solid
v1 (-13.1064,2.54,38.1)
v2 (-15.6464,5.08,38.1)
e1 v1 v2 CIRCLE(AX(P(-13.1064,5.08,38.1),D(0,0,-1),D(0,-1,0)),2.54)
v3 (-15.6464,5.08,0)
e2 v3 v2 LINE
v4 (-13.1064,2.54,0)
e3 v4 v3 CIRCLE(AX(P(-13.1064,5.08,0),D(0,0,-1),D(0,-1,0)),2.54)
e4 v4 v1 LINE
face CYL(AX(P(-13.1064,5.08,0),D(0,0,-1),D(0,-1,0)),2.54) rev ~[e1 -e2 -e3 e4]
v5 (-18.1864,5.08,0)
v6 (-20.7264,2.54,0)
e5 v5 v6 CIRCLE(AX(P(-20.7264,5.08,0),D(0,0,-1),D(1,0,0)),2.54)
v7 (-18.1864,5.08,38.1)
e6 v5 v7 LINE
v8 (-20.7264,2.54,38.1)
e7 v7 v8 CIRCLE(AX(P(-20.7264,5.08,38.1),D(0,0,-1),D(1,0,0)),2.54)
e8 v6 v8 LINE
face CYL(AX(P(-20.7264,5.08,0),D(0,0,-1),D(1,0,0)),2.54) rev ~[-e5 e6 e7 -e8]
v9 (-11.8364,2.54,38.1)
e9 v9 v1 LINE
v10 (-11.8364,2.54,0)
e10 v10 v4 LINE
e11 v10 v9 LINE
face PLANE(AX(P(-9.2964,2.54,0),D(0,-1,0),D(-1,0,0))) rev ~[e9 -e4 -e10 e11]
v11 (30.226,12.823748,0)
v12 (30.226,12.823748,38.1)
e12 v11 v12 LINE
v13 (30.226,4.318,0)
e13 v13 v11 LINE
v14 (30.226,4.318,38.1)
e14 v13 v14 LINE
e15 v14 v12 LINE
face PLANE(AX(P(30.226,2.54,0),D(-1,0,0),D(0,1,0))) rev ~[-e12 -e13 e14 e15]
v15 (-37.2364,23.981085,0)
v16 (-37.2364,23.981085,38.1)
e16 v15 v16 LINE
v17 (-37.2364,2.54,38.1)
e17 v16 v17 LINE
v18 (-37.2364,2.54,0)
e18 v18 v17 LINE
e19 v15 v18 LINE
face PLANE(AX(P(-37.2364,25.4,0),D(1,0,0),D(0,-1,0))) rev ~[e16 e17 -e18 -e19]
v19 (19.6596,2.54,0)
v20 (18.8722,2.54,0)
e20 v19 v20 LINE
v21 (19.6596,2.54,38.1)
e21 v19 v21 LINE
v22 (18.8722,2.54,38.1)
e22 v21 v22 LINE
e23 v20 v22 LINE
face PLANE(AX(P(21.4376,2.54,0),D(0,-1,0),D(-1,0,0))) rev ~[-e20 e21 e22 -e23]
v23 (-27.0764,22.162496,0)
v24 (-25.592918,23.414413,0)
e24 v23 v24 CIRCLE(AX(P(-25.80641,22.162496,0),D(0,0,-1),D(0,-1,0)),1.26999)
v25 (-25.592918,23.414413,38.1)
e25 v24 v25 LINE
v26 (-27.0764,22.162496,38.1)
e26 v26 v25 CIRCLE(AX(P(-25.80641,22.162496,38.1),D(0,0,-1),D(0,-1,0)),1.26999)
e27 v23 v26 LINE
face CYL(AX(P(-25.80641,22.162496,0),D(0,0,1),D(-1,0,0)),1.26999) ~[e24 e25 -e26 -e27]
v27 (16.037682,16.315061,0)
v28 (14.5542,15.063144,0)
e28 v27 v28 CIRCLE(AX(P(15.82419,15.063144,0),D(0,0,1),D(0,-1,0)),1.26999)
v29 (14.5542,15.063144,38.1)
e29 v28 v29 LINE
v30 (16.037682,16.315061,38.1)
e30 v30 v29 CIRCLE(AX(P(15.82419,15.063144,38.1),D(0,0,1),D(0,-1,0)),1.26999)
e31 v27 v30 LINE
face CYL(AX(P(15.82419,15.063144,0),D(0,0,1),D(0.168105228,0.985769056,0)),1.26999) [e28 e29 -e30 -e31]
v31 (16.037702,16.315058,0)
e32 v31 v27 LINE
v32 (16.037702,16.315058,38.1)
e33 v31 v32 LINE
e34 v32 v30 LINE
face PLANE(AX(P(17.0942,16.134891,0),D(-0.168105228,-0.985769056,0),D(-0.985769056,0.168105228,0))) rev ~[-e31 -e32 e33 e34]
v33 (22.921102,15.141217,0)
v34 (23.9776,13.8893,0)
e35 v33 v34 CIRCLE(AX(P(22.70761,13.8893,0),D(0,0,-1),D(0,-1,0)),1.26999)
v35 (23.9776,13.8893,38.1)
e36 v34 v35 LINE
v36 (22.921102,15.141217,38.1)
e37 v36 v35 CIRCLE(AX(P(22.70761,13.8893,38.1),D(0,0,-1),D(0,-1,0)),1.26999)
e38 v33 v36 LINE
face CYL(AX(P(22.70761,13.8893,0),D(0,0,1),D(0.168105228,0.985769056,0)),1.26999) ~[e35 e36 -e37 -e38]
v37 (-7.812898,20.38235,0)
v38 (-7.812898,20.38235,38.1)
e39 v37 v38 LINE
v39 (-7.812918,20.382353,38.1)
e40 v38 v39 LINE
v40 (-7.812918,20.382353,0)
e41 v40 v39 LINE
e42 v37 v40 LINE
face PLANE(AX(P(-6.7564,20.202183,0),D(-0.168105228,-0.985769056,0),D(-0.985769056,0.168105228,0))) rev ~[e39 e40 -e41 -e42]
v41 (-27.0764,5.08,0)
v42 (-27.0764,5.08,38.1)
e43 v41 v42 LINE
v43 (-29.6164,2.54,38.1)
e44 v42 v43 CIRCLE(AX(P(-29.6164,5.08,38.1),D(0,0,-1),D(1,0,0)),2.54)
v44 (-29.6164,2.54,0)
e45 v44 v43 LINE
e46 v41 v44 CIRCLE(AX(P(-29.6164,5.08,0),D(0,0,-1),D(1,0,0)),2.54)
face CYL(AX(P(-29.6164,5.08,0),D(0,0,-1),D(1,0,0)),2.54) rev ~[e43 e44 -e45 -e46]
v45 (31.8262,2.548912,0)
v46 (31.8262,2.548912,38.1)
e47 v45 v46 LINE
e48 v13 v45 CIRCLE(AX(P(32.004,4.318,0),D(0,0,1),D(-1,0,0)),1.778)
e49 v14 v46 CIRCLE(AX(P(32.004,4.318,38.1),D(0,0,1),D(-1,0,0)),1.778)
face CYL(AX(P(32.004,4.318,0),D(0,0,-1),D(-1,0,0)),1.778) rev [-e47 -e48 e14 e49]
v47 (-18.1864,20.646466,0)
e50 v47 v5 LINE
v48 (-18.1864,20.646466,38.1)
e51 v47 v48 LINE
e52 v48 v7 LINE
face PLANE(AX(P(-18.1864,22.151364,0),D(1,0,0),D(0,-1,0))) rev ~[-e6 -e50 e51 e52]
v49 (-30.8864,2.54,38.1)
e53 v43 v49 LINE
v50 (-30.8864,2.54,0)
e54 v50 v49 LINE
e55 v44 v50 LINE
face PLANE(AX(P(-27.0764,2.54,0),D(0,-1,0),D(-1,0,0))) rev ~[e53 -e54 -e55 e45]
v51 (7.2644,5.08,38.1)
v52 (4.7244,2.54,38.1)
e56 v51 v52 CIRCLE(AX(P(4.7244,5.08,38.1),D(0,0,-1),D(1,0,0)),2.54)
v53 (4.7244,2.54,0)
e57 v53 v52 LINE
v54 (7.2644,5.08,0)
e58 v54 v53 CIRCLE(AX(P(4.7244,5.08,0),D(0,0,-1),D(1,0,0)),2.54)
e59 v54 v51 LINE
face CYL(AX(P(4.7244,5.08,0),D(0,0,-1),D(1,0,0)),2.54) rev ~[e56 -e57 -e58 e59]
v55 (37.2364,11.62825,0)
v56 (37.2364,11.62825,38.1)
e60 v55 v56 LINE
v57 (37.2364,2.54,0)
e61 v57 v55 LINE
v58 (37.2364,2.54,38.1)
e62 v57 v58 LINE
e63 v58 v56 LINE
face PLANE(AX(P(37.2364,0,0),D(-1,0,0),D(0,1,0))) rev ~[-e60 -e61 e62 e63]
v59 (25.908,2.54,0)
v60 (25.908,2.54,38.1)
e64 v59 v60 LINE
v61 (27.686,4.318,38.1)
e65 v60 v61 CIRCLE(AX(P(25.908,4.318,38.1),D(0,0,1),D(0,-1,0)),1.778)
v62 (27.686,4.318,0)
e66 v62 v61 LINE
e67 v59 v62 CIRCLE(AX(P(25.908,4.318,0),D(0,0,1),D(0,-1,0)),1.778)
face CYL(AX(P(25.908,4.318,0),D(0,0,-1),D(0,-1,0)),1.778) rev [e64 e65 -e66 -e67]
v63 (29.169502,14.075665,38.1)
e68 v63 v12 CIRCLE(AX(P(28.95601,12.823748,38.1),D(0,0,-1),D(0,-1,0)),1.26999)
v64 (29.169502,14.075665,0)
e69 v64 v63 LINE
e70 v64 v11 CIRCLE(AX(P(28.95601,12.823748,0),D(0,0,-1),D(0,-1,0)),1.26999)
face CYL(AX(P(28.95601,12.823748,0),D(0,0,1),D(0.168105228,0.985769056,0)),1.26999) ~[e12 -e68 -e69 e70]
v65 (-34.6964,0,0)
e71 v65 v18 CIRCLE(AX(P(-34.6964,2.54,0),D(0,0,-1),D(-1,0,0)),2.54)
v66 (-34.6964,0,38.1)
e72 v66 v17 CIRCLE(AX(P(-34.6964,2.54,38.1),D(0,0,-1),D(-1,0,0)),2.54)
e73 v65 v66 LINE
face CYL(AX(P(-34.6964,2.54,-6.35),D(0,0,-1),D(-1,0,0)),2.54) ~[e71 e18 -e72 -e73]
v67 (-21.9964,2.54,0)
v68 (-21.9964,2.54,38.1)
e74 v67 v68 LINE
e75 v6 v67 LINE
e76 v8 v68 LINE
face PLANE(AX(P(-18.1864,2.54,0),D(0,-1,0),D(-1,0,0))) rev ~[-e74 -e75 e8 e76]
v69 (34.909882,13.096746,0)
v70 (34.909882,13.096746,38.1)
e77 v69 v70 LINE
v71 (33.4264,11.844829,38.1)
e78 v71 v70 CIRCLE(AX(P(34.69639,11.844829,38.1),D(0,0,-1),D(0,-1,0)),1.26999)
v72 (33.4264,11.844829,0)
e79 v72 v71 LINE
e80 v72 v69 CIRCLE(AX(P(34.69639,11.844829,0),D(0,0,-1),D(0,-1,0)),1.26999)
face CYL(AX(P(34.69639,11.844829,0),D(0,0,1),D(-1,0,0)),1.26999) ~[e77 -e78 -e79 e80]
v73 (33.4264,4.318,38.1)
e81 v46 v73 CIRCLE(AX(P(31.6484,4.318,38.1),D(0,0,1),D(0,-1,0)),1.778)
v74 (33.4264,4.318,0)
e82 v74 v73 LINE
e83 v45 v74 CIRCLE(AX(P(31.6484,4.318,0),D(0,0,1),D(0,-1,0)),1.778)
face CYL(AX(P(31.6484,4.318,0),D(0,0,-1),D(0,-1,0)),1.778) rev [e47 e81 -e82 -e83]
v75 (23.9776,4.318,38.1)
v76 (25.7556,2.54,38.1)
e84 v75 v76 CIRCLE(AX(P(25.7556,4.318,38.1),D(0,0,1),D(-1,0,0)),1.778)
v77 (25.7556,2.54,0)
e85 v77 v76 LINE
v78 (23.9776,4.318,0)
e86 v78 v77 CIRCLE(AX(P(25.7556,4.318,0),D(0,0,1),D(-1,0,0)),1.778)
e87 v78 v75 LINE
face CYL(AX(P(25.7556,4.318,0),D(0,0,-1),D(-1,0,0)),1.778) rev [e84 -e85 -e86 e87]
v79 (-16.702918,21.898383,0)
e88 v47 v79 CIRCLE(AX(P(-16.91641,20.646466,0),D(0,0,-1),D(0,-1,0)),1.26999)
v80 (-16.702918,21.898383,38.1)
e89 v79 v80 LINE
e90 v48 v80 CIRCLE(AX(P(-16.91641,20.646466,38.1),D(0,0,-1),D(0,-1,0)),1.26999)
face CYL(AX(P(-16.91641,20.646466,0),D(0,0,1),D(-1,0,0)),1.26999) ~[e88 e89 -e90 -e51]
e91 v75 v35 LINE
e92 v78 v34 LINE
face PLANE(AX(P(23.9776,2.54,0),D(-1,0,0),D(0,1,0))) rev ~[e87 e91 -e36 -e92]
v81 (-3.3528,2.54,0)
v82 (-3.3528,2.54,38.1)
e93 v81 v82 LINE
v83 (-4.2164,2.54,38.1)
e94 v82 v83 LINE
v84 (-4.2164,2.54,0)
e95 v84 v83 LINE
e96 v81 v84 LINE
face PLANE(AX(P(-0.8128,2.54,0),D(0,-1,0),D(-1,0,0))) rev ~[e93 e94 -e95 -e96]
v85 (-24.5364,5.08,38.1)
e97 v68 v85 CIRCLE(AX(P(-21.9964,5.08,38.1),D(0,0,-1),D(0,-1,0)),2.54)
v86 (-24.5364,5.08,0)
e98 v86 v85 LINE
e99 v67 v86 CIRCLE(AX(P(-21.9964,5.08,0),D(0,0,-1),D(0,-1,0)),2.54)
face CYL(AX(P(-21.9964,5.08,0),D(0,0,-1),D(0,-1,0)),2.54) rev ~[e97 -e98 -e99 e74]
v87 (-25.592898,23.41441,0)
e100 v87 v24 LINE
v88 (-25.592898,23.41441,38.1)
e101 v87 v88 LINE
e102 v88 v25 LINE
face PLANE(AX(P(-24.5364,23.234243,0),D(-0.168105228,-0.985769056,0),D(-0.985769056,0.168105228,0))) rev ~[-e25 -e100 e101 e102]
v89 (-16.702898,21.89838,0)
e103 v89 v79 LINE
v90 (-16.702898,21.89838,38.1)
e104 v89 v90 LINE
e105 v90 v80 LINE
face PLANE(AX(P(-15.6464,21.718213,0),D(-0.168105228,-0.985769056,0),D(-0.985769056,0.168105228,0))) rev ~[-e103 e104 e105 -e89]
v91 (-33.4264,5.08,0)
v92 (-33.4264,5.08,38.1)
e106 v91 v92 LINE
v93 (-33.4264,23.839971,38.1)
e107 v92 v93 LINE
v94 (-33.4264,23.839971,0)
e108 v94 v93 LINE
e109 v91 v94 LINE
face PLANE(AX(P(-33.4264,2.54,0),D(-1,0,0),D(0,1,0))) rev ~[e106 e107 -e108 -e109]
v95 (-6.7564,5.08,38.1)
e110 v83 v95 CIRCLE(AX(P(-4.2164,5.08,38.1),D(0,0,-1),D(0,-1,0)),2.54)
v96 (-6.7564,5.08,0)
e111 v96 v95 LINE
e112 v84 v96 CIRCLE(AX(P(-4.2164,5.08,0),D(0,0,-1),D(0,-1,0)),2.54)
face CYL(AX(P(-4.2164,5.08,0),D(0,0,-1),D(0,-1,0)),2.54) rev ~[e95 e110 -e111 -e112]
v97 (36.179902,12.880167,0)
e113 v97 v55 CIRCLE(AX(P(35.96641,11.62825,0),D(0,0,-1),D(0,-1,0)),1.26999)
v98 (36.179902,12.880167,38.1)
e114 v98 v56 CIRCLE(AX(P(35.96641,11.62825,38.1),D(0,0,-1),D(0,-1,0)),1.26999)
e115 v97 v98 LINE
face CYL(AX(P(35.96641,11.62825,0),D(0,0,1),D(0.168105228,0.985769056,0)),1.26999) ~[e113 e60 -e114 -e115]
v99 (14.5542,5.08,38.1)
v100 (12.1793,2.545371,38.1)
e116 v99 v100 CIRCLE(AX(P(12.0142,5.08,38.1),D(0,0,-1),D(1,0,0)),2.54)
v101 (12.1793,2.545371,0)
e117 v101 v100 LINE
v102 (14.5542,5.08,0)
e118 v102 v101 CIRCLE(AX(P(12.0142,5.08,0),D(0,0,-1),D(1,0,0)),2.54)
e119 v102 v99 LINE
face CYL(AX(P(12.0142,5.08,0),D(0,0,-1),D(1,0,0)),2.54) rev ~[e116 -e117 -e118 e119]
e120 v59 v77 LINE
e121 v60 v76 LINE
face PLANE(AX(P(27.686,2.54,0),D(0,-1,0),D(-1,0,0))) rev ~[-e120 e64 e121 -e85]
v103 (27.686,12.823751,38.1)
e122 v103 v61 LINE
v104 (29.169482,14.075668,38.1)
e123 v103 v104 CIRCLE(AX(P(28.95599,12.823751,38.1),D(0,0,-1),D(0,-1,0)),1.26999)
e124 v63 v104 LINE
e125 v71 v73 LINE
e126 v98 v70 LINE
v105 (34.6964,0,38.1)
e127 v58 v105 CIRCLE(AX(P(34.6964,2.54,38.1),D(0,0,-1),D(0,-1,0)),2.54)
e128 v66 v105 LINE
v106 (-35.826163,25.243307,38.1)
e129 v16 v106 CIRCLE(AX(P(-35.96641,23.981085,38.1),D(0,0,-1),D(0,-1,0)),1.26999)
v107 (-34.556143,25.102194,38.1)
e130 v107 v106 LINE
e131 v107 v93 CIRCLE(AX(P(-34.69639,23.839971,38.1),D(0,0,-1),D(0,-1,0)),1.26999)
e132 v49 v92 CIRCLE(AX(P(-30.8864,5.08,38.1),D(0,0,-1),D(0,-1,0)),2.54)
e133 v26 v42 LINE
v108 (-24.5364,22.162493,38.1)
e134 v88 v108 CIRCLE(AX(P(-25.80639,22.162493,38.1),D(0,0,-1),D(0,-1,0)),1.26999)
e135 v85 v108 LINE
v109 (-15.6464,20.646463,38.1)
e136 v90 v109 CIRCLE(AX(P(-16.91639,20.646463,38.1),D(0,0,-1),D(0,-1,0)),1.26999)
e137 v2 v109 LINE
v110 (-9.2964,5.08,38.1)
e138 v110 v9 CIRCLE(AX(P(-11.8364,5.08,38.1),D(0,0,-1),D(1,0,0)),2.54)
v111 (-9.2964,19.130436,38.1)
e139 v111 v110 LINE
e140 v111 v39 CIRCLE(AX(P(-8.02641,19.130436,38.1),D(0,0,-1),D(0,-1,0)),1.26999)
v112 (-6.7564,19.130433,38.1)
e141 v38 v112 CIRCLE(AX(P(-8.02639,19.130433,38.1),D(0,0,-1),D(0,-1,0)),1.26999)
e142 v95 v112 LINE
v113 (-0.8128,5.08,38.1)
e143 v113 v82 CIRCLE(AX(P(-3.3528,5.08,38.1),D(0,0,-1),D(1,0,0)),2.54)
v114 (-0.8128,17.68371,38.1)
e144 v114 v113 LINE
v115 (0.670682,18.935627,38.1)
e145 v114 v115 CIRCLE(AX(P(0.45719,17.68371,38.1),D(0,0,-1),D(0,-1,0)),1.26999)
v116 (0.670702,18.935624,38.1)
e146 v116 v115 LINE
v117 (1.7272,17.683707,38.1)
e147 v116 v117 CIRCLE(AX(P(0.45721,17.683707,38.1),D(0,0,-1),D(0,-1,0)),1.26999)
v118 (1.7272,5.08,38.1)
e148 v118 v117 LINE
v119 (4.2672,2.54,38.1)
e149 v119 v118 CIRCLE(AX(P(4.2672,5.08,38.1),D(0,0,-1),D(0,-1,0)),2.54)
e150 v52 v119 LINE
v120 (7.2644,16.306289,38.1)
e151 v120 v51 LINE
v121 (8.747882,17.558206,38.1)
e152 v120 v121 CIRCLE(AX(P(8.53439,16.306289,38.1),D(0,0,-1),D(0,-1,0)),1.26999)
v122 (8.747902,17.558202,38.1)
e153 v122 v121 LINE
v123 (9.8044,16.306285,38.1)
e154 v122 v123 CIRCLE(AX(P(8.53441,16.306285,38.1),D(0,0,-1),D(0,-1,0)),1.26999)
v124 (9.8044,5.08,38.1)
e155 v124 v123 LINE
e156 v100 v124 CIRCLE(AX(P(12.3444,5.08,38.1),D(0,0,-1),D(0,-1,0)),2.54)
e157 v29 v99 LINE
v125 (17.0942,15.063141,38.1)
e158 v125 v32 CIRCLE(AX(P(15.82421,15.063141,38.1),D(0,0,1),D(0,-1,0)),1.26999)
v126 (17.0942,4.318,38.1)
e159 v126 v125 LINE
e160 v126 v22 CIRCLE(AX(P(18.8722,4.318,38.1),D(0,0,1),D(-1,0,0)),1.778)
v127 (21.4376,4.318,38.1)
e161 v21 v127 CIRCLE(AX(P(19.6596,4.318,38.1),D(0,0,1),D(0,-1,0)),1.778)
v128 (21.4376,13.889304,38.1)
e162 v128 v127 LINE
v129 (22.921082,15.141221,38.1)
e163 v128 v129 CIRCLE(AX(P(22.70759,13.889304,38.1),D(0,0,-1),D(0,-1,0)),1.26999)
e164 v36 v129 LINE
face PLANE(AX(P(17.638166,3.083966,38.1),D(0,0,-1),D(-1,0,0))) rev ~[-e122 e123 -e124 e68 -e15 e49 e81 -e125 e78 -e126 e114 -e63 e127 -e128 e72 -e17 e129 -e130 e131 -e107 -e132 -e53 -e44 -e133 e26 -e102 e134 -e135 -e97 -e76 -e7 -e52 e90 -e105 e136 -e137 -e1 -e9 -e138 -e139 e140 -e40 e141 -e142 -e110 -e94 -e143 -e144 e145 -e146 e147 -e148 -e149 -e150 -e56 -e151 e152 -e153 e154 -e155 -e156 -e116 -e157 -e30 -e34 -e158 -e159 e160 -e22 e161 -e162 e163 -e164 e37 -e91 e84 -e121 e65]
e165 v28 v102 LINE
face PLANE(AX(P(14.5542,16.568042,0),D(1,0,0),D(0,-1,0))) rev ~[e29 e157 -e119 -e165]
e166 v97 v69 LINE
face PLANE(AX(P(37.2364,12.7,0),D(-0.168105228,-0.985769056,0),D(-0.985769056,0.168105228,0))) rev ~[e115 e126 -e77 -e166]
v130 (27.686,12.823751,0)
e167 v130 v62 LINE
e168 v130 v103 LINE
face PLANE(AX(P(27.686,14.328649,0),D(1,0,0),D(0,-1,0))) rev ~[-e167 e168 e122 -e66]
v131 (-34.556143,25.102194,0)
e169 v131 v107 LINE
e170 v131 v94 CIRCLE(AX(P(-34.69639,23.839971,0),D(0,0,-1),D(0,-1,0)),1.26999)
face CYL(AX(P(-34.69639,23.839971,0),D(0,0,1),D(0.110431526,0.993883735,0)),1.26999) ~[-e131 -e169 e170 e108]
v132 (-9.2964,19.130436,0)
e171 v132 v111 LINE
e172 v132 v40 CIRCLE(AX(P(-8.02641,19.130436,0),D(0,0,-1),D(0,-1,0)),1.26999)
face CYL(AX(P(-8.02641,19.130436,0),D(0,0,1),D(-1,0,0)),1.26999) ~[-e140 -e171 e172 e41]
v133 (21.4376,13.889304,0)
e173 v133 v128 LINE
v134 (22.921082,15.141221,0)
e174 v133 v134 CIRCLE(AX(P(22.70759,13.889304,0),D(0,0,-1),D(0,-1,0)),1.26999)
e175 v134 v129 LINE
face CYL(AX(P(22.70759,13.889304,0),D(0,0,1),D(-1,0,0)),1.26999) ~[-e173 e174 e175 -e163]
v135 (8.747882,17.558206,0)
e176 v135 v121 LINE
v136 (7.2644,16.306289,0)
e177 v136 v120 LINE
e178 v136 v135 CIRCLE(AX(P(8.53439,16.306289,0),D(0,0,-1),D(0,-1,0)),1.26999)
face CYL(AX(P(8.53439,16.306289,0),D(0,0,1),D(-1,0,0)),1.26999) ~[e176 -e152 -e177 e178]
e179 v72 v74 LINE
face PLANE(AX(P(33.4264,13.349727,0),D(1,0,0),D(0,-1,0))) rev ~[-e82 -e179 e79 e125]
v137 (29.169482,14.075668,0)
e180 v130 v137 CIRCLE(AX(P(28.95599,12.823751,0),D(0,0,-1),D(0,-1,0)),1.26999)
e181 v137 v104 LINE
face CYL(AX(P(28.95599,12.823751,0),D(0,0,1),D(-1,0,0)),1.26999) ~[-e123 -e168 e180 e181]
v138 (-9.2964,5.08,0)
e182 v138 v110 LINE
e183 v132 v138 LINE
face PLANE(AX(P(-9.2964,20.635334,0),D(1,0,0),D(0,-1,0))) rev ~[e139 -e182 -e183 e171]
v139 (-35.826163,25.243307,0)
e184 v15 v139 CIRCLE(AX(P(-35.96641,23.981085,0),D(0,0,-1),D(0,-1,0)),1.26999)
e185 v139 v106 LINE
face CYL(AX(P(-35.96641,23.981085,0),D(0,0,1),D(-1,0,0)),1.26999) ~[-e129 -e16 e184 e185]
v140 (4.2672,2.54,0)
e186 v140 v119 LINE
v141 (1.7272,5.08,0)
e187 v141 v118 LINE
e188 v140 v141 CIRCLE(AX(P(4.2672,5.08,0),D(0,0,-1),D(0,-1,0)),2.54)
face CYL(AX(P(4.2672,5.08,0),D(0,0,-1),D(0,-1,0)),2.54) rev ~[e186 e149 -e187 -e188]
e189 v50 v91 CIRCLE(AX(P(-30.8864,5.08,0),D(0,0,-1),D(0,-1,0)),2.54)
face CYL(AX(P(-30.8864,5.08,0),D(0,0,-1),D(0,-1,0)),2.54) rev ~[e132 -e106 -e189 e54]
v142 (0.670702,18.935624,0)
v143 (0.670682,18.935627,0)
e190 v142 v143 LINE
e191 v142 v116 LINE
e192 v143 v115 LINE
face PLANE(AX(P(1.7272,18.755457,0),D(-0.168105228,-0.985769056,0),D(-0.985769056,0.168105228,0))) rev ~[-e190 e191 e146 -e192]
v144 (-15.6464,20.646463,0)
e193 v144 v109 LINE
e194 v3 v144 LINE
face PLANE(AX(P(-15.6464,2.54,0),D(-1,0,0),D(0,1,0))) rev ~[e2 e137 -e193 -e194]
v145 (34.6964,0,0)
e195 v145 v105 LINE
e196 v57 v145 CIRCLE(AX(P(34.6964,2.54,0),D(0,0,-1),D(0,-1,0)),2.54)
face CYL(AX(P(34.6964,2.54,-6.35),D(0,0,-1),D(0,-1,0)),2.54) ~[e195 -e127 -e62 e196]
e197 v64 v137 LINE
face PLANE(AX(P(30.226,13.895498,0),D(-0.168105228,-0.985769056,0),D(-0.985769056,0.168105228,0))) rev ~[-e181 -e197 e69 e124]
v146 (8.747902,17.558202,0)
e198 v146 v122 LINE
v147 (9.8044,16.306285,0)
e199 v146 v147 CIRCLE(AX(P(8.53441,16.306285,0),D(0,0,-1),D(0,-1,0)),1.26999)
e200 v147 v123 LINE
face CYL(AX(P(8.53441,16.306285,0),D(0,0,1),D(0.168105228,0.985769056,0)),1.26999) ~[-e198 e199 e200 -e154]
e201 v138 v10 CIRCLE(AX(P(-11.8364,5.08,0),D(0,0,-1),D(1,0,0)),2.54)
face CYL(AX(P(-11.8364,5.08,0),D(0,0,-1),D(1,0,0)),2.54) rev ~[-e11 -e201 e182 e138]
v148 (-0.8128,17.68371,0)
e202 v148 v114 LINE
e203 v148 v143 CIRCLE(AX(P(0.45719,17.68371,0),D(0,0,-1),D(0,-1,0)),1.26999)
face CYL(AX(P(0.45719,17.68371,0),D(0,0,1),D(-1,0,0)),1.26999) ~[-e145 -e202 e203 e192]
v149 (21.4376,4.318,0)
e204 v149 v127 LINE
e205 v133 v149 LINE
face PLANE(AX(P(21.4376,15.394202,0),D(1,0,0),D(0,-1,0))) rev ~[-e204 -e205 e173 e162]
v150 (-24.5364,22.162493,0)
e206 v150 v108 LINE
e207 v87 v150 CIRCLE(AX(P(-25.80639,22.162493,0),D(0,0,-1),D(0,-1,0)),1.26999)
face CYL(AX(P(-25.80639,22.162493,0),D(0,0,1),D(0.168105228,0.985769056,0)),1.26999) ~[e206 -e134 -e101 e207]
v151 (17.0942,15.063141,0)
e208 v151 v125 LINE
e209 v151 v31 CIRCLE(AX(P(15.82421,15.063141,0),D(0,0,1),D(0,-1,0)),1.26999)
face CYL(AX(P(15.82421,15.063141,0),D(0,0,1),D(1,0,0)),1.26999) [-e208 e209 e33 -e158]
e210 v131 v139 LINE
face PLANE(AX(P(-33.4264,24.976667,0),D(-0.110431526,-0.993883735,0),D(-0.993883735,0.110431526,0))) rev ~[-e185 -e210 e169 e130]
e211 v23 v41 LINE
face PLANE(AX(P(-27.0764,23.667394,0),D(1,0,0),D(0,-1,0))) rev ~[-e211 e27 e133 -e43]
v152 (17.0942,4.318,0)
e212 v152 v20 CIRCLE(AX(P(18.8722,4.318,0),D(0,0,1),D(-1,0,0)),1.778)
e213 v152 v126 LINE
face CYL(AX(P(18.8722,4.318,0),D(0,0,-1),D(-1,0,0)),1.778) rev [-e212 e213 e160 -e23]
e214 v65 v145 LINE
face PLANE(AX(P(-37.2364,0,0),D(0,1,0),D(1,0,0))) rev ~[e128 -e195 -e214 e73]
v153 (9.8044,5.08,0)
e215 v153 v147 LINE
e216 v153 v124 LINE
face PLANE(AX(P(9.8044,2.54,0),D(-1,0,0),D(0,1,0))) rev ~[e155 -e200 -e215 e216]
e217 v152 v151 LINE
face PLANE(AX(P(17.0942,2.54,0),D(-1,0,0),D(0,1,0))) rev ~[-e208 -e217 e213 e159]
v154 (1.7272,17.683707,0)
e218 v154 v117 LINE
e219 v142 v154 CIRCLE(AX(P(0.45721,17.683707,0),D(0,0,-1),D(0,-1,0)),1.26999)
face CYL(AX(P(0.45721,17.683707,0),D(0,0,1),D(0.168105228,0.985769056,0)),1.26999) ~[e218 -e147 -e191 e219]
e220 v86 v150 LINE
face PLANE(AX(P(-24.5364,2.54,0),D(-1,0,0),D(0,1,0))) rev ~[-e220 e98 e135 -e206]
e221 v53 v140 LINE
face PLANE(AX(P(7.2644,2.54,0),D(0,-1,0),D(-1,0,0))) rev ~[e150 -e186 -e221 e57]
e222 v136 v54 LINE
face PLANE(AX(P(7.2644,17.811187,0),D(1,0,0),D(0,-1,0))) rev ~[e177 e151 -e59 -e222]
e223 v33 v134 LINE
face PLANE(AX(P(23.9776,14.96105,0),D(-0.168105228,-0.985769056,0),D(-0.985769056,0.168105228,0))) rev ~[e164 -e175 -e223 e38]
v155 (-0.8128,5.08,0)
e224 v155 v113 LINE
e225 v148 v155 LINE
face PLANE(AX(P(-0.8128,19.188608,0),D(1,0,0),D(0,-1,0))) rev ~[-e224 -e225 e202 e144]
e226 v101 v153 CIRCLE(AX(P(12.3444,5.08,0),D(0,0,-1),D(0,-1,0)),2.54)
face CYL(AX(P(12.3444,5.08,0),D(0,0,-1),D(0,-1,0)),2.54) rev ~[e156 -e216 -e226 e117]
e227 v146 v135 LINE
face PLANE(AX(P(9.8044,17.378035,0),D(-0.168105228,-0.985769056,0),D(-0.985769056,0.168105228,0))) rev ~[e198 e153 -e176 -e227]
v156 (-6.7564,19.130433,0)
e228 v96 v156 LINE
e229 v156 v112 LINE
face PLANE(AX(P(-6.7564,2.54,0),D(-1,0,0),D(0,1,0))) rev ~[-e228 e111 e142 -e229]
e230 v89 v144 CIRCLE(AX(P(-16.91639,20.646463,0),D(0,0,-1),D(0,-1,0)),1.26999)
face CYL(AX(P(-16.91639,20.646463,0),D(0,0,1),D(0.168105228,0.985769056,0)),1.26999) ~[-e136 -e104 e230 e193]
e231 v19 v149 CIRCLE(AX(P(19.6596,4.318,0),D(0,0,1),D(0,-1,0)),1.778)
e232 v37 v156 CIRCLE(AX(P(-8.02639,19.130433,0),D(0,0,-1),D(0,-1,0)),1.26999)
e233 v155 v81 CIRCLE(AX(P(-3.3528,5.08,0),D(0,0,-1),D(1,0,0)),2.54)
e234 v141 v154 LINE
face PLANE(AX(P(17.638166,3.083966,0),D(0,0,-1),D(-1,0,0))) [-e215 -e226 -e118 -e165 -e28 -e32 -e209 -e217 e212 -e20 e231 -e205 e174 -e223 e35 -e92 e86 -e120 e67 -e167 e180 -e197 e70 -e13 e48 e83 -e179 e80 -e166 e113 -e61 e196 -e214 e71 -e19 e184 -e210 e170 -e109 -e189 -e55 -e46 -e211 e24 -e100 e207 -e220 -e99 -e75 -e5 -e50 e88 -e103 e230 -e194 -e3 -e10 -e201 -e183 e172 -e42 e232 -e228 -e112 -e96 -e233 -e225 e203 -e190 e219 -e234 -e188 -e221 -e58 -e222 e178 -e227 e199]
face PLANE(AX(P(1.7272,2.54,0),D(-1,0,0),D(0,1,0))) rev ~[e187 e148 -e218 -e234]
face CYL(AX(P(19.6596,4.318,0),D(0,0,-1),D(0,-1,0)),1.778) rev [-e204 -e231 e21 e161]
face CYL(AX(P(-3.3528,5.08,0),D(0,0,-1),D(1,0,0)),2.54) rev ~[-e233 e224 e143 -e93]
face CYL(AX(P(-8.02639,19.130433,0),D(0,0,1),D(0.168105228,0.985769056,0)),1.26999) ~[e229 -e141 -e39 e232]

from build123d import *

# Parameters (mm, degrees)
F1_DEPTH    = 38.1
F2_T1_DEPTH = 38.1
F2_T3_DEPTH = 50.8
F3_T1_DEPTH = 38.1
F4_R        = 1.26999


# Not quite as in the source:
# - a fillet or chamfer that OpenCascade refuses, or shapes differently, is made with other operations: its cross-section is extruded or revolved along the edge and cut away or added
# - a fillet or chamfer is up to 0.001 mm smaller than in the source, because OpenCascade refuses the exact size


with BuildPart() as f1:
    # F0 (on Top) → F1 (new body)
    with BuildSketch(Plane.XY):
        Polygon((-37.2364, 25.4), (-37.2364, 0), (37.2364, 0), (37.2364, 12.7), (33.4264, 13.3497271487), (33.4264, 2.54), (30.226, 2.54), (30.226, 13.8954979536), (27.686, 14.3286493861), (27.686, 2.54), (23.9776, 2.54), (23.9776, 14.9610504775), (21.4376, 15.39420191), (21.4376, 2.54), (17.0942, 2.54), (17.0942, 16.1348908595), (14.5542, 16.568042292), (14.5542, 2.54), (9.8044, 2.54), (9.8044, 17.3780354707), (7.2644, 17.8111869031), (7.2644, 2.54), (1.7272, 2.54), (1.7272, 18.7554570259), (-0.8128, 19.1886084584), (-0.8128, 2.54), (-6.7564, 2.54), (-6.7564, 20.2021828104), (-9.2964, 20.6353342428), (-9.2964, 2.54), (-15.6464, 2.54), (-15.6464, 21.718212824), (-18.1864, 22.1513642565), (-18.1864, 2.54), (-24.5364, 2.54), (-24.5364, 23.2342428377), (-27.0764, 23.6673942701), (-27.0764, 2.54), (-33.4264, 2.54), (-33.4264, 24.9766666667), align=None)
    extrude(amount=F1_DEPTH)

    # F2: fillet of radius 2.54 on 14 edges, made by hand

    # F2_s2 → F2_t1 (join)
    with BuildSketch(Plane.XY):
        with BuildLine():
            ThreePointArc((-30.8864, 2.54), (-32.6824512242, 3.2839487758), (-33.4264, 5.08))
            Line((-33.4264, 5.08), (-33.4264, 2.54))
            Line((-33.4264, 2.54), (-30.8864, 2.54))
        make_face()
        with BuildLine():
            ThreePointArc((-27.0764, 5.08), (-27.8203487758, 3.2839487758), (-29.6164, 2.54))
            Line((-29.6164, 2.54), (-27.0764, 2.54))
            Line((-27.0764, 2.54), (-27.0764, 5.08))
        make_face()
        with BuildLine():
            ThreePointArc((-21.9964, 2.54), (-23.7924512242, 3.2839487758), (-24.5364, 5.08))
            Line((-24.5364, 5.08), (-24.5364, 2.54))
            Line((-24.5364, 2.54), (-21.9964, 2.54))
        make_face()
        with BuildLine():
            ThreePointArc((-18.1864, 5.08), (-18.9303487758, 3.2839487758), (-20.7264, 2.54))
            Line((-20.7264, 2.54), (-18.1864, 2.54))
            Line((-18.1864, 2.54), (-18.1864, 5.08))
        make_face()
        with BuildLine():
            ThreePointArc((-13.1064, 2.54), (-14.9024512242, 3.2839487758), (-15.6464, 5.08))
            Line((-15.6464, 5.08), (-15.6464, 2.54))
            Line((-15.6464, 2.54), (-13.1064, 2.54))
        make_face()
        with BuildLine():
            ThreePointArc((-9.2964, 5.08), (-10.0403487758, 3.2839487758), (-11.8364, 2.54))
            Line((-11.8364, 2.54), (-9.2964, 2.54))
            Line((-9.2964, 2.54), (-9.2964, 5.08))
        make_face()
        with BuildLine():
            ThreePointArc((-4.2164, 2.54), (-6.0124512242, 3.2839487758), (-6.7564, 5.08))
            Line((-6.7564, 5.08), (-6.7564, 2.54))
            Line((-6.7564, 2.54), (-4.2164, 2.54))
        make_face()
        with BuildLine():
            ThreePointArc((-0.8128, 5.08), (-1.5567487758, 3.2839487758), (-3.3528, 2.54))
            Line((-3.3528, 2.54), (-0.8128, 2.54))
            Line((-0.8128, 2.54), (-0.8128, 5.08))
        make_face()
        with BuildLine():
            ThreePointArc((4.2672, 2.54), (2.4711487758, 3.2839487758), (1.7272, 5.08))
            Line((1.7272, 5.08), (1.7272, 2.54))
            Line((1.7272, 2.54), (4.2672, 2.54))
        make_face()
        with BuildLine():
            ThreePointArc((7.2644, 5.08), (6.5204512242, 3.2839487758), (4.7244, 2.54))
            Line((4.7244, 2.54), (7.2644, 2.54))
            Line((7.2644, 2.54), (7.2644, 5.08))
        make_face()
        with BuildLine():
            ThreePointArc((12.3444, 2.54), (10.5483487758, 3.2839487758), (9.8044, 5.08))
            Line((9.8044, 5.08), (9.8044, 2.54))
            Line((9.8044, 2.54), (12.3444, 2.54))
        make_face()
        with BuildLine():
            ThreePointArc((14.5542, 5.08), (13.8102512242, 3.2839487758), (12.0142, 2.54))
            Line((12.0142, 2.54), (14.5542, 2.54))
            Line((14.5542, 2.54), (14.5542, 5.08))
        make_face()
    extrude(amount=F2_T1_DEPTH)

    # F2_s4 → F2_t3 (cut)
    with BuildSketch(Plane.XY.offset(-6.35)):
        with BuildLine():
            ThreePointArc((-37.2364, 2.54), (-36.4924512242, 0.7439487758), (-34.6964, 0))
            Line((-34.6964, 0), (-37.2364, 0))
            Line((-37.2364, 0), (-37.2364, 2.54))
        make_face()
        with BuildLine():
            ThreePointArc((34.6964, 0), (36.4924512242, 0.7439487758), (37.2364, 2.54))
            Line((37.2364, 2.54), (37.2364, 0))
            Line((37.2364, 0), (34.6964, 0))
        make_face()
    extrude(amount=F2_T3_DEPTH, mode=Mode.SUBTRACT)

    # F3: fillet of radius 1.778 on 6 edges, made by hand

    # F3_s2 → F3_t1 (join)
    with BuildSketch(Plane.XY):
        with BuildLine():
            ThreePointArc((17.0942, 4.318), (17.6149641431, 3.0607641431), (18.8722, 2.54))
            Line((18.8722, 2.54), (17.0942, 2.54))
            Line((17.0942, 2.54), (17.0942, 4.318))
        make_face()
        with BuildLine():
            ThreePointArc((19.6596, 2.54), (20.9168358569, 3.0607641431), (21.4376, 4.318))
            Line((21.4376, 4.318), (21.4376, 2.54))
            Line((21.4376, 2.54), (19.6596, 2.54))
        make_face()
        with BuildLine():
            ThreePointArc((23.9776, 4.318), (24.4983641431, 3.0607641431), (25.7556, 2.54))
            Line((25.7556, 2.54), (23.9776, 2.54))
            Line((23.9776, 2.54), (23.9776, 4.318))
        make_face()
        with BuildLine():
            ThreePointArc((25.908, 2.54), (27.1652358569, 3.0607641431), (27.686, 4.318))
            Line((27.686, 4.318), (27.686, 2.54))
            Line((27.686, 2.54), (25.908, 2.54))
        make_face()
        with BuildLine():
            ThreePointArc((30.226, 4.318), (30.7467641431, 3.0607641431), (32.004, 2.54))
            Line((32.004, 2.54), (30.226, 2.54))
            Line((30.226, 2.54), (30.226, 4.318))
        make_face()
        with BuildLine():
            ThreePointArc((31.6484, 2.54), (32.9056358569, 3.0607641431), (33.4264, 4.318))
            Line((33.4264, 4.318), (33.4264, 2.54))
            Line((33.4264, 2.54), (31.6484, 2.54))
        make_face()
    extrude(amount=F3_T1_DEPTH)

    # F4 (radius 1.27 in the source; OpenCascade refuses exactly that, so slightly less here)
    f4_edges = [f1.edges().sort_by_distance(p)[0] for p in [
        (33.4264, 13.349727, 19.05),
        (30.226, 13.895498, 19.05),
        (27.686, 14.328649, 19.05),
        (23.9776, 14.96105, 19.05),
        (21.4376, 15.394202, 19.05),
        (17.0942, 16.134891, 19.05),
        (14.5542, 16.568042, 19.05),
        (9.8044, 17.378035, 19.05),
        (7.2644, 17.811187, 19.05),
        (1.7272, 18.755457, 19.05),
        (-0.8128, 19.188608, 19.05),
        (-6.7564, 20.202183, 19.05),
        (-15.6464, 21.718213, 19.05),
        (-24.5364, 23.234243, 19.05),
        (-27.0764, 23.667394, 19.05),
        (-33.4264, 24.976667, 19.05),
        (-37.2364, 25.4, 19.05),
        (37.2364, 12.7, 19.05),
        (-9.2964, 20.635334, 19.05),
        (-18.1864, 22.151364, 19.05),
    ]]
    fillet(f4_edges, radius=F4_R)


solid = f1.part
